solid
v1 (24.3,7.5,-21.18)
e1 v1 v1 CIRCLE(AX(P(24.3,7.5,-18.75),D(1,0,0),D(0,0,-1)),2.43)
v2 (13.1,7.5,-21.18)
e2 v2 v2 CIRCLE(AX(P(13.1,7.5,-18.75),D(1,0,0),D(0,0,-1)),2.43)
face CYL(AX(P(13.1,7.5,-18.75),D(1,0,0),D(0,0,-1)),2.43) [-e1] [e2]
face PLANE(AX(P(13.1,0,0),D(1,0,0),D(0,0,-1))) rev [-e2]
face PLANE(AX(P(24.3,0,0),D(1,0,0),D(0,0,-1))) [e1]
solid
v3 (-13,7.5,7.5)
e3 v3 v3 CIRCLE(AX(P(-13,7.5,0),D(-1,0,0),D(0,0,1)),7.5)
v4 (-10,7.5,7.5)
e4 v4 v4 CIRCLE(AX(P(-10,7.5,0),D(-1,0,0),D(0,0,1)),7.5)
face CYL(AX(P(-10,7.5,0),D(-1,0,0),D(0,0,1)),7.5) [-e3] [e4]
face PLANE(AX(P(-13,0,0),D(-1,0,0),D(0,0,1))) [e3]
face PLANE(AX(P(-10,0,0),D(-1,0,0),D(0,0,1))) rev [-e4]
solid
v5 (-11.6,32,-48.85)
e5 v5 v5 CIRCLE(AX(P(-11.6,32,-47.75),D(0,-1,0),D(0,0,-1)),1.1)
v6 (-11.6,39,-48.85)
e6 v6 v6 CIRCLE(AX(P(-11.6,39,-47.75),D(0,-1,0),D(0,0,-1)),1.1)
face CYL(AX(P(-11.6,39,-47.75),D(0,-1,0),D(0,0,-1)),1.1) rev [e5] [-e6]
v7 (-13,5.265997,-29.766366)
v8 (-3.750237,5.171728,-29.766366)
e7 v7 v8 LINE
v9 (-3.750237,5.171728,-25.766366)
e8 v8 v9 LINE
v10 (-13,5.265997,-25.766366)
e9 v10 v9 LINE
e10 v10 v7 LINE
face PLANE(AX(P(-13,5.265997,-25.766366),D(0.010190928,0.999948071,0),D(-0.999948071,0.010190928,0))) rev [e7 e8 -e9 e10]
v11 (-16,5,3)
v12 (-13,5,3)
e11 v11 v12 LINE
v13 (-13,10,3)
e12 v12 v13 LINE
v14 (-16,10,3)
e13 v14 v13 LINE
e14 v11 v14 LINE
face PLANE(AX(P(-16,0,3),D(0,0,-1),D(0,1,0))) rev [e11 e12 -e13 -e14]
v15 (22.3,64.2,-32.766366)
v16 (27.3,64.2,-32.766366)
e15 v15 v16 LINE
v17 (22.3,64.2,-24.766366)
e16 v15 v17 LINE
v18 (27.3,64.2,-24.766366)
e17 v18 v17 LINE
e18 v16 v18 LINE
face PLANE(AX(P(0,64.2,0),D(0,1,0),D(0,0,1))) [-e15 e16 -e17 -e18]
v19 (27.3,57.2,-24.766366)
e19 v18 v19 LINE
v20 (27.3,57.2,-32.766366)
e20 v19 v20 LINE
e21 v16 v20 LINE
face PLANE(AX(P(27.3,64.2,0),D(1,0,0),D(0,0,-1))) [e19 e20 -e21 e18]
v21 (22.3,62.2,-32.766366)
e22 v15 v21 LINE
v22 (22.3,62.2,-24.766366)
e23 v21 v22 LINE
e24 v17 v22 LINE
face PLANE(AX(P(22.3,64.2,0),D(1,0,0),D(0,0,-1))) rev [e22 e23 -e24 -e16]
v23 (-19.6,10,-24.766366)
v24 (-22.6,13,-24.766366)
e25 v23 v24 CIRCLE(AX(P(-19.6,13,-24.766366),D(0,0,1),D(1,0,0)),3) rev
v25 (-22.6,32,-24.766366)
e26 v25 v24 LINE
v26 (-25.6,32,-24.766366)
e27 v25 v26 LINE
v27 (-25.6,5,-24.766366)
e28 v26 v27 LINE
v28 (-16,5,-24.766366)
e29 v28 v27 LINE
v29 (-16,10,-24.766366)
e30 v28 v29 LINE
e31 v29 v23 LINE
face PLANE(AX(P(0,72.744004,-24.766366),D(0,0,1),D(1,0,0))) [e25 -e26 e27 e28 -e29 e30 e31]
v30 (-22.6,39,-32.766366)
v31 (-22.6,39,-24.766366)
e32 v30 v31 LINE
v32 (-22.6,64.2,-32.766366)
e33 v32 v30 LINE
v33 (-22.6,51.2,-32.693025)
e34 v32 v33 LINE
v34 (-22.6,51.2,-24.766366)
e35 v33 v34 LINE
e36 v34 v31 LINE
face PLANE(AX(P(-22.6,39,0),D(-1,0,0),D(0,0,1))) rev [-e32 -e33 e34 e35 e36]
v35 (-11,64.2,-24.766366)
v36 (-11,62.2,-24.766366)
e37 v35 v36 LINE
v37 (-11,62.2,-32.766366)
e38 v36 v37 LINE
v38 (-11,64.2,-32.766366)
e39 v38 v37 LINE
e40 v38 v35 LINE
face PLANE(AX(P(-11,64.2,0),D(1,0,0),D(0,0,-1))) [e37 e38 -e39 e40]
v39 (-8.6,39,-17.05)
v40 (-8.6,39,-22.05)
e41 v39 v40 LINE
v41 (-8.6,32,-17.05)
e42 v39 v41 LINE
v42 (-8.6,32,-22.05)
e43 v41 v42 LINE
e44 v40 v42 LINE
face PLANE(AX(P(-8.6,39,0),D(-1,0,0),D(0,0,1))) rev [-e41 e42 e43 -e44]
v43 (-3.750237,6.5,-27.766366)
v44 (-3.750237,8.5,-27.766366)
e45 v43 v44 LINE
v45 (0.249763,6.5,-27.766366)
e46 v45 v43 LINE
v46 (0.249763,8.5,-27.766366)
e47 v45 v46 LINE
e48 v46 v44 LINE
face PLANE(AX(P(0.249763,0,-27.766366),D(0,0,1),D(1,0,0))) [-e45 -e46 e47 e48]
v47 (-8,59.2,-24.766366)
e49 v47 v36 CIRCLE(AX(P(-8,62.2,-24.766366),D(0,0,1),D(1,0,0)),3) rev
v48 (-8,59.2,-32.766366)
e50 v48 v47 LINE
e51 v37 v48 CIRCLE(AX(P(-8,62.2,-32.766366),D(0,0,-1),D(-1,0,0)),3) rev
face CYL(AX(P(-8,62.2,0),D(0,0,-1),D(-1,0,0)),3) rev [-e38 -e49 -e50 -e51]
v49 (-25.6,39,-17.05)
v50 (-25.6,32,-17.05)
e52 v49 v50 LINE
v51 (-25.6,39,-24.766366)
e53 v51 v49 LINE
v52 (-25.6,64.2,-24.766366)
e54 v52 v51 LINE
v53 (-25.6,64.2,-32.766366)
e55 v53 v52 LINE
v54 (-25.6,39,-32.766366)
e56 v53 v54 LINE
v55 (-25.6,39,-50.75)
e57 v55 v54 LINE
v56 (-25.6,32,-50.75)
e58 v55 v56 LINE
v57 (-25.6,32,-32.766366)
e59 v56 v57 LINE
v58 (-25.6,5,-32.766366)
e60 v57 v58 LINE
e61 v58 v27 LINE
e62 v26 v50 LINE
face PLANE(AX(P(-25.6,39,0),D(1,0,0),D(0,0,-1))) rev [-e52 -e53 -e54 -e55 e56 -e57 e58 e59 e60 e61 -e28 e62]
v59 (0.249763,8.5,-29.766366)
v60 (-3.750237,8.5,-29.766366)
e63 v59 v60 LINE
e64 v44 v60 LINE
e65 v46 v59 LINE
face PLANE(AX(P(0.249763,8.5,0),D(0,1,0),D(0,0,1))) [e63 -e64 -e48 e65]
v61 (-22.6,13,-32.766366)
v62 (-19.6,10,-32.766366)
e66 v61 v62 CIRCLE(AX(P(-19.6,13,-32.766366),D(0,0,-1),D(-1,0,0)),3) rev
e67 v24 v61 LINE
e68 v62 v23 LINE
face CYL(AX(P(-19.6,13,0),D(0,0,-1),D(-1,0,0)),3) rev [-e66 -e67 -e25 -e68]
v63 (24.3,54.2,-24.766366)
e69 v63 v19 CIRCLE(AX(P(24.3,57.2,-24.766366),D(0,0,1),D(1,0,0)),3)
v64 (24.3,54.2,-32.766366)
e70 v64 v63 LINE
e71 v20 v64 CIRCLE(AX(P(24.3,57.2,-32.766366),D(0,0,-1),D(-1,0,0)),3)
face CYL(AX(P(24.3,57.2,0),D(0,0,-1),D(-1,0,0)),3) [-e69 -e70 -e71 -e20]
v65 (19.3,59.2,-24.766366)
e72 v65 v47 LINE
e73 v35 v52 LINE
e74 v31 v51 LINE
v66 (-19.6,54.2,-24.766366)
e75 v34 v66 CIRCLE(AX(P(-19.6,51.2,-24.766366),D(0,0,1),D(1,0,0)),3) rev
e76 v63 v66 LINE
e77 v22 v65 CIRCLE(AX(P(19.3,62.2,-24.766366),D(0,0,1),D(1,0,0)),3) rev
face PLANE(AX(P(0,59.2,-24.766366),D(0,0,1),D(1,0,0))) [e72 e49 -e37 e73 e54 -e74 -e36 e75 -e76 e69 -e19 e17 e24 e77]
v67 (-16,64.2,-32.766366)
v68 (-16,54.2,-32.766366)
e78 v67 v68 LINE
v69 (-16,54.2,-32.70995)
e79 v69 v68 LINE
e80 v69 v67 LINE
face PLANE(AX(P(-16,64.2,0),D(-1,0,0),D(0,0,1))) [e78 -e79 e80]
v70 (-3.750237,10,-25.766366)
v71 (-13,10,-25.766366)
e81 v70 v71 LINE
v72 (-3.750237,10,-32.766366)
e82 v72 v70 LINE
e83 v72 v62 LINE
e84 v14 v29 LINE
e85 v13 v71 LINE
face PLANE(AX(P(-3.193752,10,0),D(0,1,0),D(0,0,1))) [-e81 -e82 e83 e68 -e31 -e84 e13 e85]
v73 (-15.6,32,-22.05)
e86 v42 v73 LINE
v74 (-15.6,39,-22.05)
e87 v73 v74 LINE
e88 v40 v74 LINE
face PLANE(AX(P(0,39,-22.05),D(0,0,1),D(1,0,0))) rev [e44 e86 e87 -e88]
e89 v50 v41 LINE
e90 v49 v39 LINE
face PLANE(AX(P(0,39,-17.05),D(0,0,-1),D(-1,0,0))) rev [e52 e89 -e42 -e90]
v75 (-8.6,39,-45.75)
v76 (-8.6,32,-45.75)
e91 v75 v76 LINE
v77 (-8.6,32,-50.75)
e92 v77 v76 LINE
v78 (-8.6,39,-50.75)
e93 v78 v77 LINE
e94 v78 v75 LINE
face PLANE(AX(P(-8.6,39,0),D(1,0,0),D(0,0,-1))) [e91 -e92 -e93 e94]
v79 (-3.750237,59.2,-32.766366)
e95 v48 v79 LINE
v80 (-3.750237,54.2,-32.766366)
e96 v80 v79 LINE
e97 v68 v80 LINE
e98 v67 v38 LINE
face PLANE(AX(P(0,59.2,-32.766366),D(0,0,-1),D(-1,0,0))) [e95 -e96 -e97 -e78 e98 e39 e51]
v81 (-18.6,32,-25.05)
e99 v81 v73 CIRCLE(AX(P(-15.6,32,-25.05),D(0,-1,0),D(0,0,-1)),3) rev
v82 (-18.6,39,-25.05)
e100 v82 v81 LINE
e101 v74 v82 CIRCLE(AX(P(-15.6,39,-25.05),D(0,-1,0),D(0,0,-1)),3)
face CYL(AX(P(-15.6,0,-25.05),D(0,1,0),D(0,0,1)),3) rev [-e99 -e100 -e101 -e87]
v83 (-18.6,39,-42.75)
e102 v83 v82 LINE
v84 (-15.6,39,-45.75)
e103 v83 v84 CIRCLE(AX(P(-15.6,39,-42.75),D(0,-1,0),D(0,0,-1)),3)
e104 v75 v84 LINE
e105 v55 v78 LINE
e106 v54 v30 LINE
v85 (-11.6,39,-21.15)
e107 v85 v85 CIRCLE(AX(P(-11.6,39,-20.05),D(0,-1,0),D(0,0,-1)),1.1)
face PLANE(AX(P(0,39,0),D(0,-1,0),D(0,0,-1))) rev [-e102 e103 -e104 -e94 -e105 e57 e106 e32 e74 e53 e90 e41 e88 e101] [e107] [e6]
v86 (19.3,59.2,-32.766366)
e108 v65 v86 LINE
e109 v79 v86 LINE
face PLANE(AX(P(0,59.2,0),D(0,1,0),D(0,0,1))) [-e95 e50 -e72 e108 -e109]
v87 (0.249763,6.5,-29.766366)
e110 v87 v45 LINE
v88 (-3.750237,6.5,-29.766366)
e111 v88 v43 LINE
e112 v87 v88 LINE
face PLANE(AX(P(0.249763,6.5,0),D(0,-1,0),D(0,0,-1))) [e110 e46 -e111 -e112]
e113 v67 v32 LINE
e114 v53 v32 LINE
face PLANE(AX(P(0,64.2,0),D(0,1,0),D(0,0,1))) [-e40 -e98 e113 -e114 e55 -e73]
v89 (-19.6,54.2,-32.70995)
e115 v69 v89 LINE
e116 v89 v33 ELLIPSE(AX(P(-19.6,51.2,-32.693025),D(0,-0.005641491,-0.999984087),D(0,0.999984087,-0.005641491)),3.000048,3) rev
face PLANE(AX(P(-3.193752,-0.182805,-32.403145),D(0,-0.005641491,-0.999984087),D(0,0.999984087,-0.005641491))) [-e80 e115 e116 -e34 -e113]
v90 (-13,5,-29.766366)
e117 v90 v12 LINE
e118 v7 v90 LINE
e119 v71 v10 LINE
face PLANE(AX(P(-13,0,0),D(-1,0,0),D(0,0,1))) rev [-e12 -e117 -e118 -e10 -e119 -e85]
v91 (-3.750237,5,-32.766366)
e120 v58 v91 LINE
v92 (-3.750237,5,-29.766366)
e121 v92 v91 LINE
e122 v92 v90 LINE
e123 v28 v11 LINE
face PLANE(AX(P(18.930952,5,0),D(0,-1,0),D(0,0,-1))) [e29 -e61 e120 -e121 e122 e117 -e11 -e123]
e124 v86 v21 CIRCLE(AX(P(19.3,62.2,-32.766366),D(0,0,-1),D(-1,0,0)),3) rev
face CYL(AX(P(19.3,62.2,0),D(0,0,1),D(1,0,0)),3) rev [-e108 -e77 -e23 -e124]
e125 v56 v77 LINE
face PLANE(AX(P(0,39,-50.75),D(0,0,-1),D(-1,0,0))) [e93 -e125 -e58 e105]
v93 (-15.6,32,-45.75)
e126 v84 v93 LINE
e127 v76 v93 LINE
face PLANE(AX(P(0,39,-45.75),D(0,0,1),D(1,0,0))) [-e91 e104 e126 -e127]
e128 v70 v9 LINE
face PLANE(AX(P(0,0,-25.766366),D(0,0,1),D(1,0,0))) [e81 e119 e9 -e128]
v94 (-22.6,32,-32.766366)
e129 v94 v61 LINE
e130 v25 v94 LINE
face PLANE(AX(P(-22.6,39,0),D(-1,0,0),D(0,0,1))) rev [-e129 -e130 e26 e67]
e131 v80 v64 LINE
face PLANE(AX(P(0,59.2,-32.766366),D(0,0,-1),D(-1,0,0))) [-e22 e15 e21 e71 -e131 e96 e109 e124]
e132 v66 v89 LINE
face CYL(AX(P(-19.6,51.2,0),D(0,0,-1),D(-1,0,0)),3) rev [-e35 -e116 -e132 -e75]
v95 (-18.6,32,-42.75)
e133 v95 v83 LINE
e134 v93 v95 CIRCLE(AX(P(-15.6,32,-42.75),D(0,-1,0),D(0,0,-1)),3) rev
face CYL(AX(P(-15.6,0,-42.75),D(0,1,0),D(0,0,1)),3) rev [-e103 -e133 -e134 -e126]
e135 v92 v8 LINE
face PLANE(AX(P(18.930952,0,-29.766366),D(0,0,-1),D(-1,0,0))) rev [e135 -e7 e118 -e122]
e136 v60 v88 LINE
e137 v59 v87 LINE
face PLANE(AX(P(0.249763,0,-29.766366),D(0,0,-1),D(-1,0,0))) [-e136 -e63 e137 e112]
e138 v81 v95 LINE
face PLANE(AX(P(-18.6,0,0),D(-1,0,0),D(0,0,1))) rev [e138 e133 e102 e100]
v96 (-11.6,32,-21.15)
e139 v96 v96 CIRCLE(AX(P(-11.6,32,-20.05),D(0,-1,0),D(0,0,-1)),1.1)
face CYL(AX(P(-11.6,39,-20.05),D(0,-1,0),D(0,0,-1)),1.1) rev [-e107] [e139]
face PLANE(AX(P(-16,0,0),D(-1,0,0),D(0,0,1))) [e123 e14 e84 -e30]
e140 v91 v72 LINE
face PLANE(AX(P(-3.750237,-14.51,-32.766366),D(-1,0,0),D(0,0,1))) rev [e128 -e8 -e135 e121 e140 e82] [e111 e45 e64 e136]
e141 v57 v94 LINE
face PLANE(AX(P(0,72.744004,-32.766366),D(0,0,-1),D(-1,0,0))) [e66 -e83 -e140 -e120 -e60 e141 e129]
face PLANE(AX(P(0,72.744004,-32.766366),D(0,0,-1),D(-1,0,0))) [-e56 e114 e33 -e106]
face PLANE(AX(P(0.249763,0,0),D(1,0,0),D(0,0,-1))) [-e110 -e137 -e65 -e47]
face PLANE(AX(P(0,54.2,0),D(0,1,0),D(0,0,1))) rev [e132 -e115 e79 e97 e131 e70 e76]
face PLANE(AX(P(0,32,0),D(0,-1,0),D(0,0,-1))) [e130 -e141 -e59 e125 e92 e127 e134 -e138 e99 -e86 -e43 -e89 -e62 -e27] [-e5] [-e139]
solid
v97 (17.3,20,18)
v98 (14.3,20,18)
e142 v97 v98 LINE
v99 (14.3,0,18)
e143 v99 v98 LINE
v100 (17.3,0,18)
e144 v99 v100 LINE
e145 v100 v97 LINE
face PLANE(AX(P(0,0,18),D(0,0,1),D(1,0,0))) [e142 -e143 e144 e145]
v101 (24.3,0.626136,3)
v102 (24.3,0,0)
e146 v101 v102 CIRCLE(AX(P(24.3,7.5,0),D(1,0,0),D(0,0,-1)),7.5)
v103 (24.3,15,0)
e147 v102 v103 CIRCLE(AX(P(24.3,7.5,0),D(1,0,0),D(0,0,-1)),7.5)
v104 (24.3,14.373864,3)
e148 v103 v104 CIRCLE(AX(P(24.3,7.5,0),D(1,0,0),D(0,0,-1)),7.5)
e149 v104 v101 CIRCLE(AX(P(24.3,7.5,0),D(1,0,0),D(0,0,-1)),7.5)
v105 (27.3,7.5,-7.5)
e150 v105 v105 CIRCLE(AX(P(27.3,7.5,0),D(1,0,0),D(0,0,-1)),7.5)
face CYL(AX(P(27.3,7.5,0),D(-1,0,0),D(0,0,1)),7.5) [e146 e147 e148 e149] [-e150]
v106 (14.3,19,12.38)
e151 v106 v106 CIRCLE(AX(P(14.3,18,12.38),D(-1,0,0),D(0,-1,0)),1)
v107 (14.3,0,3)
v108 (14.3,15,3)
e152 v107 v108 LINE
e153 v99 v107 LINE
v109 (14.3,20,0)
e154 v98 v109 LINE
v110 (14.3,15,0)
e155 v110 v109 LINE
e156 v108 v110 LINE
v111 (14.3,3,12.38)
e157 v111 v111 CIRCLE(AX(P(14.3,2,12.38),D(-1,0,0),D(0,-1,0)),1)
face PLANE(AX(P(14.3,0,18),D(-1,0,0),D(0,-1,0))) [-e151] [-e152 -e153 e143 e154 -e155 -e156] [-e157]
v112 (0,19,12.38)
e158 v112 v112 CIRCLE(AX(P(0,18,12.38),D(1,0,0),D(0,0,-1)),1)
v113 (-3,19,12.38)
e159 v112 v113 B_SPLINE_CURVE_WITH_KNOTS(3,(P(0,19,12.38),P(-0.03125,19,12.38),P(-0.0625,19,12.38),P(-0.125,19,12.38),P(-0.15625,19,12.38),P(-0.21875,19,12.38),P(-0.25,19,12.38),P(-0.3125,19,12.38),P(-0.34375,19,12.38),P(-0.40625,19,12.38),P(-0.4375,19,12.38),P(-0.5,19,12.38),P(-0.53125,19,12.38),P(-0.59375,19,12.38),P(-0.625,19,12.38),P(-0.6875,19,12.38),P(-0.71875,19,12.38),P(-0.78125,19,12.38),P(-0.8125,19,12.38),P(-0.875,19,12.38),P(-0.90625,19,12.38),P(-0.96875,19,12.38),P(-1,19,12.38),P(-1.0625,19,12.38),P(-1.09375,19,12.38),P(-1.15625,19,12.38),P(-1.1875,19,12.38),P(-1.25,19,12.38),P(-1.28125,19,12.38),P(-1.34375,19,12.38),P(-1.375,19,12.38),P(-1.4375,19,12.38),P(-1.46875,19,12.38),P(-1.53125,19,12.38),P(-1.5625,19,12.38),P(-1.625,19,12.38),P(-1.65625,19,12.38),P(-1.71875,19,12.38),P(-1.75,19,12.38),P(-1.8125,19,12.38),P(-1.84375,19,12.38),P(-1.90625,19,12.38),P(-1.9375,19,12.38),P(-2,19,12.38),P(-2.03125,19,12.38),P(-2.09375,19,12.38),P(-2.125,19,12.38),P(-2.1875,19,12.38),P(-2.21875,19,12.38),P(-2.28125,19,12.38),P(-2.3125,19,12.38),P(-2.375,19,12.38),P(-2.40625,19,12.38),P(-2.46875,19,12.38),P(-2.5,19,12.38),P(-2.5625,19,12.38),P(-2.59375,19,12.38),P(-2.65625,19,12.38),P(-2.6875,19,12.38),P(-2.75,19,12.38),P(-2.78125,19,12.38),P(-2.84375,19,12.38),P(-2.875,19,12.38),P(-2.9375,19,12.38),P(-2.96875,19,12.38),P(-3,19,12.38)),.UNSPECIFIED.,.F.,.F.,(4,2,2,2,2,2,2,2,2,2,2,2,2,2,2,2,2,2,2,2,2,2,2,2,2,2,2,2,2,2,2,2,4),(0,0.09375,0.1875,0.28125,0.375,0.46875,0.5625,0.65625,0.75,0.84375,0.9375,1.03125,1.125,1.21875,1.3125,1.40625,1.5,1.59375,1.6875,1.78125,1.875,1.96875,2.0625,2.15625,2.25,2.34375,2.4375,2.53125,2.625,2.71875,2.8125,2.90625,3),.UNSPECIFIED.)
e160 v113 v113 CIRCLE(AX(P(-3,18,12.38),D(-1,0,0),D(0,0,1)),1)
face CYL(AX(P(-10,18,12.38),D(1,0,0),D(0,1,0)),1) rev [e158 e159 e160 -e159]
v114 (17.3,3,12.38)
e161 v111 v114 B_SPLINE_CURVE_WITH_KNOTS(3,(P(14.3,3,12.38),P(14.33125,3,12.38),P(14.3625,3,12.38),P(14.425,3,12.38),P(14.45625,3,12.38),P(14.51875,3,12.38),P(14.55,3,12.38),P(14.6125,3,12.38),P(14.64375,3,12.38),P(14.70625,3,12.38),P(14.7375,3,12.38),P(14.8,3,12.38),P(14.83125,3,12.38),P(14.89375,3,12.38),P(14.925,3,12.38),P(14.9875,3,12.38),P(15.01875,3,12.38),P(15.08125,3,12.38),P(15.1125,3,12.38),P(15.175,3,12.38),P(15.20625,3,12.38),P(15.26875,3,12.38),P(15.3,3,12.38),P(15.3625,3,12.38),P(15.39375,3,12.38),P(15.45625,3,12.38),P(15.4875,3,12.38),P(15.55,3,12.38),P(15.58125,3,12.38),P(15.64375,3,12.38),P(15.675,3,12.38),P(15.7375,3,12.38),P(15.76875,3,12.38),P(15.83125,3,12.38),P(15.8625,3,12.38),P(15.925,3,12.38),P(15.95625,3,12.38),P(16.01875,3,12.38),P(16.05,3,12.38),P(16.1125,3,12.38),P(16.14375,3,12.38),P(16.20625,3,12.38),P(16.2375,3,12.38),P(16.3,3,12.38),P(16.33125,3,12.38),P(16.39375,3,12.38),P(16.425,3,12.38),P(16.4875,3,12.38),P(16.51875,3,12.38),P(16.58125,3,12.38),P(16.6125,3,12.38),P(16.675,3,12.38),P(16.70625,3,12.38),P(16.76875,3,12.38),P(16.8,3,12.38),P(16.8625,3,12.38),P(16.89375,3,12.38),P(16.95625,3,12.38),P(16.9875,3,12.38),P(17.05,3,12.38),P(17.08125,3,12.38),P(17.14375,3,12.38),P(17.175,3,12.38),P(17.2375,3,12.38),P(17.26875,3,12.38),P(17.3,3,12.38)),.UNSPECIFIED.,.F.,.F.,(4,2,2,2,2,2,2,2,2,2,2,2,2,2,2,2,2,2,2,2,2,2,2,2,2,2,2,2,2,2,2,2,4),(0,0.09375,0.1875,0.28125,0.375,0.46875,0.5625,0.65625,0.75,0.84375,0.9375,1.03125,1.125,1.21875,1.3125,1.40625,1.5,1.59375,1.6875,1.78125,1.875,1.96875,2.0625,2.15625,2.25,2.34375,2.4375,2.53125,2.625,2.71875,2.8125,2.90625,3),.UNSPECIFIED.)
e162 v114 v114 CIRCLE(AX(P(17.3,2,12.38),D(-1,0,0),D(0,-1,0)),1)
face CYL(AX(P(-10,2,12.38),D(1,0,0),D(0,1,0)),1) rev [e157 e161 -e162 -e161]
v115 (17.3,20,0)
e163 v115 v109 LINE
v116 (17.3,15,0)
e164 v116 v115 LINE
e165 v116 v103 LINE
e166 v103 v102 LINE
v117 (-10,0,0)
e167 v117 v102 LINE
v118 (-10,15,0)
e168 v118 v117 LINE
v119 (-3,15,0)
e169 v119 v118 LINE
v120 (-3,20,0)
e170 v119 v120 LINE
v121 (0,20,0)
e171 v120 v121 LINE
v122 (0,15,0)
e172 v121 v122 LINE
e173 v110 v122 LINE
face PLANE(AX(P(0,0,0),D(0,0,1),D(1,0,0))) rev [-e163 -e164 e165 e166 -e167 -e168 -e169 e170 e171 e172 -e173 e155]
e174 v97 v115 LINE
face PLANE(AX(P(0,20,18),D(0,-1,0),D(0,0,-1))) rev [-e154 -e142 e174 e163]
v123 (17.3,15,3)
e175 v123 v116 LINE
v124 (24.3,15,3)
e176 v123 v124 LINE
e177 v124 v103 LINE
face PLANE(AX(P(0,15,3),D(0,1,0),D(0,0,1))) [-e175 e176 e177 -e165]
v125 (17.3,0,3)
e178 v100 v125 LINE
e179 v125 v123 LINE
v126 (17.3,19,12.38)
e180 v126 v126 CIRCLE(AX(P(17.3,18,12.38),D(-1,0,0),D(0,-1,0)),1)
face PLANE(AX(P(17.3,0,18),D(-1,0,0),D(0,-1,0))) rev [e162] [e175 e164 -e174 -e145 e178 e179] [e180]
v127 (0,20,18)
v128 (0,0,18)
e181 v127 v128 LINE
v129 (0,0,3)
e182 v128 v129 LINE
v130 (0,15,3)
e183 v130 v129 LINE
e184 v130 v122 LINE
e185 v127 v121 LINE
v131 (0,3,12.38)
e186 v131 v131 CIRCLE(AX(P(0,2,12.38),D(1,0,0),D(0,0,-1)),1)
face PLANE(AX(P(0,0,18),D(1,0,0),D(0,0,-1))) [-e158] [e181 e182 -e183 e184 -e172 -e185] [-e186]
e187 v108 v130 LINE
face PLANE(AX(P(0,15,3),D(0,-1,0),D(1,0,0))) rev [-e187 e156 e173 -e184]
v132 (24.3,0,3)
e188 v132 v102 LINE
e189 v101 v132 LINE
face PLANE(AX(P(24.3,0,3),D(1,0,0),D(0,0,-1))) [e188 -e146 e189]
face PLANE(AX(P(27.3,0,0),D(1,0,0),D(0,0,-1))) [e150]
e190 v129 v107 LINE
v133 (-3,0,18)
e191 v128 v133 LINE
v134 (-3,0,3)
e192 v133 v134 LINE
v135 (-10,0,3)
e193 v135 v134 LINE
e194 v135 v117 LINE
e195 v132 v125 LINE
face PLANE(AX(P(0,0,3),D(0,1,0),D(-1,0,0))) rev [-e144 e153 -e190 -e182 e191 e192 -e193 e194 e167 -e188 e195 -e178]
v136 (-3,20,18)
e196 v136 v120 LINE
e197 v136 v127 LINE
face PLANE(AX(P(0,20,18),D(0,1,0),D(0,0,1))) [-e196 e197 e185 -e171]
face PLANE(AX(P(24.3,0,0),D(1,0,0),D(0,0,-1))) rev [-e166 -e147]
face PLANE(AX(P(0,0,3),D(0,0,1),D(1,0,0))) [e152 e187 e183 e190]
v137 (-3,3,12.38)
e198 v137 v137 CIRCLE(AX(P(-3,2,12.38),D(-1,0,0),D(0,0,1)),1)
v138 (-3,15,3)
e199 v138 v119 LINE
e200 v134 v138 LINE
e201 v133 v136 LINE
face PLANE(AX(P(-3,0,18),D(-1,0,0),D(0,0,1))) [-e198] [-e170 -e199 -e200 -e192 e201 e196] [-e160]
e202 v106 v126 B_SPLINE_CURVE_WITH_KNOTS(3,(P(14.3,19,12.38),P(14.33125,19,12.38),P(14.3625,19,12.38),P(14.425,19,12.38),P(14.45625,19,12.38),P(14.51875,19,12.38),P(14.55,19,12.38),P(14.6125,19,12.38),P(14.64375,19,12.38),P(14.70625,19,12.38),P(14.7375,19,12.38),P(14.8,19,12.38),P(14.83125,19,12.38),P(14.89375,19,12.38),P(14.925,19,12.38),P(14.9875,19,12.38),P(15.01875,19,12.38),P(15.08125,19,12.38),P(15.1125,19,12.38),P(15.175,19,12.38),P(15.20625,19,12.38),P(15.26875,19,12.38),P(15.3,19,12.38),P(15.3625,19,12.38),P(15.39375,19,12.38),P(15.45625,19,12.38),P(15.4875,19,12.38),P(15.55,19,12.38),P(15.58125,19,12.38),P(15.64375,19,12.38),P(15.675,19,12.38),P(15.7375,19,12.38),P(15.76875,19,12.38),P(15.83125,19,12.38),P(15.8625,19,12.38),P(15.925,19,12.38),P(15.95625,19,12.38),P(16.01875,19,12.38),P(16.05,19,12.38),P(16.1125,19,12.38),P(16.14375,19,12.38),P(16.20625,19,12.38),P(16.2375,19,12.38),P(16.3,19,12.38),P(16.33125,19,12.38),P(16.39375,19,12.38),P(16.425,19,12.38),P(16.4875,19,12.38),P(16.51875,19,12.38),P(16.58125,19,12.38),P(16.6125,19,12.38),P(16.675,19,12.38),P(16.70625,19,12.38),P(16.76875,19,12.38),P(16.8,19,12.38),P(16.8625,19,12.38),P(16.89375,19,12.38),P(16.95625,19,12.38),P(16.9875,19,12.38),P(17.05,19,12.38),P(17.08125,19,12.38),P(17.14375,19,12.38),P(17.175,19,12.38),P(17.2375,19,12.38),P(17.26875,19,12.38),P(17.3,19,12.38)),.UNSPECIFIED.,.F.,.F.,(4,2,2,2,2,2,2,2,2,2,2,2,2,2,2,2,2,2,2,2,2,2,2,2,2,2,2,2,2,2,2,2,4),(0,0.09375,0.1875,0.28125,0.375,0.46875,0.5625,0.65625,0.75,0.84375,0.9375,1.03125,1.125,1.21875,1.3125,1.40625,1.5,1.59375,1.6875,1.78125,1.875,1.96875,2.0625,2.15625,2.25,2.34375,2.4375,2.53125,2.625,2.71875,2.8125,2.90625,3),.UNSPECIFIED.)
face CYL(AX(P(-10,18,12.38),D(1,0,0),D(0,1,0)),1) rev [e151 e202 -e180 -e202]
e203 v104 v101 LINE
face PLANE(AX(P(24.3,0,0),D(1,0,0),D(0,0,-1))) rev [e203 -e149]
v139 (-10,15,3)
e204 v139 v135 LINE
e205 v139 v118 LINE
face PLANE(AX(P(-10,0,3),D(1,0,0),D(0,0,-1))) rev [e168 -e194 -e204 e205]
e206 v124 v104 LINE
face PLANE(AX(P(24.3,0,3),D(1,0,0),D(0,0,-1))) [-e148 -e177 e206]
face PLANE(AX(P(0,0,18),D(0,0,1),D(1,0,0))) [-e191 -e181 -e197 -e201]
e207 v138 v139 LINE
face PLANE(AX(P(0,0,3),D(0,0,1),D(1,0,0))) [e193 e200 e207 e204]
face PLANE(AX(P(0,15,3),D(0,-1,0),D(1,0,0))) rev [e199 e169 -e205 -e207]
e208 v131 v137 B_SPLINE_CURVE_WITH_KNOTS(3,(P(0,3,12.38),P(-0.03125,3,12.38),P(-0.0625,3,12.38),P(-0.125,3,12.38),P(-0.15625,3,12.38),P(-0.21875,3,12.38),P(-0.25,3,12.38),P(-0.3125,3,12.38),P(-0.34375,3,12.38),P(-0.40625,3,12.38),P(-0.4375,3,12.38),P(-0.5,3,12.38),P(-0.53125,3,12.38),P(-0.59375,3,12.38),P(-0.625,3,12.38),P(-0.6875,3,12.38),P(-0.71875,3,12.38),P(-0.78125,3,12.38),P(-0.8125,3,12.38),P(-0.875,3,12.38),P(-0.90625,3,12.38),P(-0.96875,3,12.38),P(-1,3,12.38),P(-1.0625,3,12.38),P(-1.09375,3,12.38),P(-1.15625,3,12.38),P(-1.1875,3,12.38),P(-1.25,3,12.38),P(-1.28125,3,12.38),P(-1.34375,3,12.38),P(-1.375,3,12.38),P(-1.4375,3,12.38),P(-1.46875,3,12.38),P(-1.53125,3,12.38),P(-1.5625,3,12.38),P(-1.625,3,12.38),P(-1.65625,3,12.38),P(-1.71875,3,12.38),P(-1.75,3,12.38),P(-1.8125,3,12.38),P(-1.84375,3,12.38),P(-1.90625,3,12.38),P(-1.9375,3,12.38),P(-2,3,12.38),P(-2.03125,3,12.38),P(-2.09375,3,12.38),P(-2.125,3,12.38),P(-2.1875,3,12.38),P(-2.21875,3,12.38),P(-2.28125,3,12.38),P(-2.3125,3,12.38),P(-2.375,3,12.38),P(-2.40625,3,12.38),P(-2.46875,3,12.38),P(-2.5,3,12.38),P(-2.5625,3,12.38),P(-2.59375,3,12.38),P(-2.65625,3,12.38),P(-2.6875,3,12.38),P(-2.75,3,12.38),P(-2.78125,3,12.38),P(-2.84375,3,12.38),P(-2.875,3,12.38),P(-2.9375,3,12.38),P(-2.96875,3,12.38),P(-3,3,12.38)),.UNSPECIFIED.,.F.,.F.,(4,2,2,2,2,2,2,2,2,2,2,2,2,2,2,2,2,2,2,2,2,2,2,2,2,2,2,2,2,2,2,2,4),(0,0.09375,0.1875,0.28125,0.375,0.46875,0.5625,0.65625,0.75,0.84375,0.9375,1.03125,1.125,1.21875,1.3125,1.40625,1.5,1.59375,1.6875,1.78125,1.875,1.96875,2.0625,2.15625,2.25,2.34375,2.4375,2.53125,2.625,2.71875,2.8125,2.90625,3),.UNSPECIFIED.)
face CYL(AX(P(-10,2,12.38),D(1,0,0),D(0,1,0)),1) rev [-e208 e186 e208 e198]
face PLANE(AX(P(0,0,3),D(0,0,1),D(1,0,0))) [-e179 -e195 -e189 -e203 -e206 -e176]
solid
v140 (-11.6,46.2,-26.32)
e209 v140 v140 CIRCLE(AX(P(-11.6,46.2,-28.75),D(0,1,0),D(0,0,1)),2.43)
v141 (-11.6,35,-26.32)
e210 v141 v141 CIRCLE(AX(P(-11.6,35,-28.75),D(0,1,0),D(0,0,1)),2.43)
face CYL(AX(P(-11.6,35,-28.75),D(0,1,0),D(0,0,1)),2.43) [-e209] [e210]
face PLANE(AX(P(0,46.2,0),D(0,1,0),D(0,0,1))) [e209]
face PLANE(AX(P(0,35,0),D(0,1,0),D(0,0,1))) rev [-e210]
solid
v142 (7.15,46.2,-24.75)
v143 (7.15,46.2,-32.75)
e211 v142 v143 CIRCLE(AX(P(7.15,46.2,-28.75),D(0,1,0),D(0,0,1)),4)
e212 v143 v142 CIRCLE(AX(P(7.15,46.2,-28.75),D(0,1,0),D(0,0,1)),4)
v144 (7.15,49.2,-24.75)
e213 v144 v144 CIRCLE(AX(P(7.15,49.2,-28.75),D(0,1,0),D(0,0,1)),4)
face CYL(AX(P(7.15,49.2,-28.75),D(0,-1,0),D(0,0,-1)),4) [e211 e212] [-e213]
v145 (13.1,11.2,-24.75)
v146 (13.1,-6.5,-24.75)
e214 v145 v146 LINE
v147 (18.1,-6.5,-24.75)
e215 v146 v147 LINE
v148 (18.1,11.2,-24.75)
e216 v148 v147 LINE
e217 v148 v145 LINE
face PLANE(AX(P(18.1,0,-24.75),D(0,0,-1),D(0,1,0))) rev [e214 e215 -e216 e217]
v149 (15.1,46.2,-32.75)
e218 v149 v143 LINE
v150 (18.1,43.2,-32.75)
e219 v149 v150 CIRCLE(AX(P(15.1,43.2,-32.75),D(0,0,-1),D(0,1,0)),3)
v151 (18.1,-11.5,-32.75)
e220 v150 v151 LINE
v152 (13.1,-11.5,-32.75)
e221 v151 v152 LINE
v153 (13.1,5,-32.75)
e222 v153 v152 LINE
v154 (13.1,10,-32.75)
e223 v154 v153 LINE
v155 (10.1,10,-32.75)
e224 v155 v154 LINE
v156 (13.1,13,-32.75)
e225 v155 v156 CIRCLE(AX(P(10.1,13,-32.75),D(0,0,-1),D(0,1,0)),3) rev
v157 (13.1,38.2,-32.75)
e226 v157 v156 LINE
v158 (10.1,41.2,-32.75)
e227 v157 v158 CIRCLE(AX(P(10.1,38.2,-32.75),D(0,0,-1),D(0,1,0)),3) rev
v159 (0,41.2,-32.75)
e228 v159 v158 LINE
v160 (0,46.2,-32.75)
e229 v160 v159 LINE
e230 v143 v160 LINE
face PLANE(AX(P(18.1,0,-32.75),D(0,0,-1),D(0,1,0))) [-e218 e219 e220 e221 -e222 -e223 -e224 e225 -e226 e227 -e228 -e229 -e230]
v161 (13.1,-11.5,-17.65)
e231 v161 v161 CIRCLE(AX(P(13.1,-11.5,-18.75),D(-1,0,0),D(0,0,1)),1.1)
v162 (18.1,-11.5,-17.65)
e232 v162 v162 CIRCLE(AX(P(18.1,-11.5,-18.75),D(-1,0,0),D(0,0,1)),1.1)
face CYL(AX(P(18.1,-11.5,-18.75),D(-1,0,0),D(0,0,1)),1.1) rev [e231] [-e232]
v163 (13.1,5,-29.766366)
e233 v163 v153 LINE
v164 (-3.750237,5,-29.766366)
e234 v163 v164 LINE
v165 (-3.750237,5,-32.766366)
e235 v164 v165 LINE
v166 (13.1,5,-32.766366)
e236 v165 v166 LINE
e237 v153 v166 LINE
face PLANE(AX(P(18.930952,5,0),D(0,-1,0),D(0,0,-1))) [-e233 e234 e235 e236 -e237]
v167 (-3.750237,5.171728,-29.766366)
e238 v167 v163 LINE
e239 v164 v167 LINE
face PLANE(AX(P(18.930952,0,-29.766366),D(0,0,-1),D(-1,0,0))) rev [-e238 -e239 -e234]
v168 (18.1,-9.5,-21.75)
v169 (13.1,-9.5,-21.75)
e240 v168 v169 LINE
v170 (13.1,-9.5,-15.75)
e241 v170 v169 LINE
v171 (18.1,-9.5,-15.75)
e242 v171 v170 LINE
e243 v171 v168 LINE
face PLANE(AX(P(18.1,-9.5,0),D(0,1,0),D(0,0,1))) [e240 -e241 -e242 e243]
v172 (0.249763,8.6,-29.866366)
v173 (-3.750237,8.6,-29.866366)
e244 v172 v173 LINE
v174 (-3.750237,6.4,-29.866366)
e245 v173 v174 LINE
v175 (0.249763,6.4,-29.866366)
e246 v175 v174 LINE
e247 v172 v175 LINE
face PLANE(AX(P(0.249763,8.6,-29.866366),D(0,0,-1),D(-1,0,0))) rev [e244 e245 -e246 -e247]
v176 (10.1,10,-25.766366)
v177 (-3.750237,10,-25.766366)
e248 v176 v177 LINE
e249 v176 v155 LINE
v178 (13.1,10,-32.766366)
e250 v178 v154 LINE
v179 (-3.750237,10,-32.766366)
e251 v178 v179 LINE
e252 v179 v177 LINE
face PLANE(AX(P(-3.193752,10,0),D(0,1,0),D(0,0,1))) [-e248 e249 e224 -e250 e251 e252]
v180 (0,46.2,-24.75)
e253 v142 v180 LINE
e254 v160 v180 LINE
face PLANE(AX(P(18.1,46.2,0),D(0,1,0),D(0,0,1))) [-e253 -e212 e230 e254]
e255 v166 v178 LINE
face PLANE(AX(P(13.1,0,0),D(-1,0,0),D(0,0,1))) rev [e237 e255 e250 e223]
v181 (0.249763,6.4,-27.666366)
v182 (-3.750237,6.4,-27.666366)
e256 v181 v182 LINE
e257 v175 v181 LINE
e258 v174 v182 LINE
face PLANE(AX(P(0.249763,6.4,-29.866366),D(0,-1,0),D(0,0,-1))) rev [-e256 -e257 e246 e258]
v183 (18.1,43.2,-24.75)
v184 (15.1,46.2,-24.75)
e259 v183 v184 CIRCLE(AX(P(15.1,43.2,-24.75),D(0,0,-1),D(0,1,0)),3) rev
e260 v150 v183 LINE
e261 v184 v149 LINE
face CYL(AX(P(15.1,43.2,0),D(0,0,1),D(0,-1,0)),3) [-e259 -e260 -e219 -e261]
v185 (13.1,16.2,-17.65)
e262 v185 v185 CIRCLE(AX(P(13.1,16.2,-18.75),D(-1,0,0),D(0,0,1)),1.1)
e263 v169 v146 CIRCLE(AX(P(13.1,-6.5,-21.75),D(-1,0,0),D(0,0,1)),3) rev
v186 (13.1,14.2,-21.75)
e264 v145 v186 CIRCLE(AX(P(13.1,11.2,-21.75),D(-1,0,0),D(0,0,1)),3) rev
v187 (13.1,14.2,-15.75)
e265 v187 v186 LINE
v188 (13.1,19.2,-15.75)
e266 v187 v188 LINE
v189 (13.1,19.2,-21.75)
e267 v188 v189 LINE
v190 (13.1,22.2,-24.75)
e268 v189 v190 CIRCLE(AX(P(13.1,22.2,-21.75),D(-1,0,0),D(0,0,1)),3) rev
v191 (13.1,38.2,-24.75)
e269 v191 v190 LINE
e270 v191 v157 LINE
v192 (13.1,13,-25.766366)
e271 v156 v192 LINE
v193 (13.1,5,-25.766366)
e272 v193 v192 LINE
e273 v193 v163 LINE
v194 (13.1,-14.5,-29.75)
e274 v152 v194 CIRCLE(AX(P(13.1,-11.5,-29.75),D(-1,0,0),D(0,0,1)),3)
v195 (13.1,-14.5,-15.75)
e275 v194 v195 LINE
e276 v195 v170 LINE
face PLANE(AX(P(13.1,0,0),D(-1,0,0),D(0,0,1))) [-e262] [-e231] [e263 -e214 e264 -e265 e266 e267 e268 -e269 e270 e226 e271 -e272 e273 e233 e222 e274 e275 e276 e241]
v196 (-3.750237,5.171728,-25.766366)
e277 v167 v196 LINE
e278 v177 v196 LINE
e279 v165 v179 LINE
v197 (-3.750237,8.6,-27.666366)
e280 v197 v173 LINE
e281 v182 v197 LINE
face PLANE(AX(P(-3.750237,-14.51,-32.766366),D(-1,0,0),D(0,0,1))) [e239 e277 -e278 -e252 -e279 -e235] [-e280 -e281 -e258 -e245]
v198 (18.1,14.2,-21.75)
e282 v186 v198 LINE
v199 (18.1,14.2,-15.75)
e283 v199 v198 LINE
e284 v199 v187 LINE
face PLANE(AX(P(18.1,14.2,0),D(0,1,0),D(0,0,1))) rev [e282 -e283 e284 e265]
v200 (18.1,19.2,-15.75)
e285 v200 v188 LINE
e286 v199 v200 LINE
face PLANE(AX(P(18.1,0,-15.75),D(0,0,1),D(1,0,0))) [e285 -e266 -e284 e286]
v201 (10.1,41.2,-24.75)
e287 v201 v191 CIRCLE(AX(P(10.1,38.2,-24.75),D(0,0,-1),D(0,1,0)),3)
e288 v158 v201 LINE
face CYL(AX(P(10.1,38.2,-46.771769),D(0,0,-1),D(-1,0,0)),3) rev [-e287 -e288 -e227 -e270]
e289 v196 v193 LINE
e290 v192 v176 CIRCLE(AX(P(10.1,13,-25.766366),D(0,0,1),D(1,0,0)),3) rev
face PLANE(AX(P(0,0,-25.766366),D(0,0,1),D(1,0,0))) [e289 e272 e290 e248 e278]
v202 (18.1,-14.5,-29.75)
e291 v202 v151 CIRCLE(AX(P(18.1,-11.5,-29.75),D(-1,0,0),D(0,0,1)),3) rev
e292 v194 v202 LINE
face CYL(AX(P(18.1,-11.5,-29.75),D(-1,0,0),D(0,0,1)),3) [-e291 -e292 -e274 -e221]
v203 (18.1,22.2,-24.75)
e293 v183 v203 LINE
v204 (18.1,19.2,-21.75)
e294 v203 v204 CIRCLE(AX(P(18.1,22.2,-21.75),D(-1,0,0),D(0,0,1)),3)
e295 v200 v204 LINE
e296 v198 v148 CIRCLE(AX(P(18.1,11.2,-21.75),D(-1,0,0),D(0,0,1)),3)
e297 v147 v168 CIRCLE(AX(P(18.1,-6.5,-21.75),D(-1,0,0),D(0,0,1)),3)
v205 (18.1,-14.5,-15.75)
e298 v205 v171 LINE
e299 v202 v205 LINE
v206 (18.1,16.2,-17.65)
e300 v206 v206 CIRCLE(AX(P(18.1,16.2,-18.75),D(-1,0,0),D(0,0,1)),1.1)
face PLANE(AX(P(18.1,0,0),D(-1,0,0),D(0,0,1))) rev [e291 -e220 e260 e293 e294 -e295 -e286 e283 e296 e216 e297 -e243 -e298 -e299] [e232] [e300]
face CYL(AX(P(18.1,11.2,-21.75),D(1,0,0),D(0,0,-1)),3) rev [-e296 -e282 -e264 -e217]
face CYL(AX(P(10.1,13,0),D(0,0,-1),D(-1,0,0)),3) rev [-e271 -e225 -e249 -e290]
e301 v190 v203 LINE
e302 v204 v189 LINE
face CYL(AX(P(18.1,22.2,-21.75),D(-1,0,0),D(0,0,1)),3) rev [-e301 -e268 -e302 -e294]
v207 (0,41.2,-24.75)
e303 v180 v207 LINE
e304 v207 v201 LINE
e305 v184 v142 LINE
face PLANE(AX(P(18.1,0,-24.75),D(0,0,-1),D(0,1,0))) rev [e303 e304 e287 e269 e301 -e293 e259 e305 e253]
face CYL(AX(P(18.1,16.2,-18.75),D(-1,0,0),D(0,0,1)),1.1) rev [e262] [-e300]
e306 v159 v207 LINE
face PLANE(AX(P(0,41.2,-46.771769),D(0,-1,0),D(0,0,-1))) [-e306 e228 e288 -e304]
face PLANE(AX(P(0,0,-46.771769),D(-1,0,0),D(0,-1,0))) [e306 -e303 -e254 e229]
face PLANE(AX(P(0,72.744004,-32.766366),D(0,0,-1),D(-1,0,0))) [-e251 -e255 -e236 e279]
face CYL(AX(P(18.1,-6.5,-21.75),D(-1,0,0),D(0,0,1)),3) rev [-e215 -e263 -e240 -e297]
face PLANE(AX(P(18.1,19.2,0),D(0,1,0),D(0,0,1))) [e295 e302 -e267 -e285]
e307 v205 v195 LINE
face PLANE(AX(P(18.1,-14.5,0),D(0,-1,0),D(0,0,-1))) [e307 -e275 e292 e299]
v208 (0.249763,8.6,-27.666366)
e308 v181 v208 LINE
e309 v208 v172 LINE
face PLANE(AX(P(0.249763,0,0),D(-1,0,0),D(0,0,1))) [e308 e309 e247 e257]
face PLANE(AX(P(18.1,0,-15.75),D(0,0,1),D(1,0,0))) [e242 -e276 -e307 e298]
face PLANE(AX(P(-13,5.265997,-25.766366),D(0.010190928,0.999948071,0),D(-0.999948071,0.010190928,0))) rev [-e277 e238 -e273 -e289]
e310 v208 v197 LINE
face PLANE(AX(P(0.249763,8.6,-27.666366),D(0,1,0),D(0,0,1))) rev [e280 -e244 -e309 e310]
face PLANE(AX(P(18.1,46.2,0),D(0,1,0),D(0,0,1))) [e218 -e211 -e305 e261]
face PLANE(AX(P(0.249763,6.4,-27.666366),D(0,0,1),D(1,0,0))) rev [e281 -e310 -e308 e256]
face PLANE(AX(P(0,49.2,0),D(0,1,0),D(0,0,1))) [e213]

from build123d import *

# Parameters (mm, degrees)
SKETCH_1_W                 = 14.3
SKETCH_1_H                 = 15
EXTRUDE_1_DEPTH            = 3
SKETCH_1_W_2               = 7
EXTRUDE_1_2_DEPTH          = 3
EXTRUDE_1_3_DEPTH          = 3
SKETCH_1_5_W               = 3
SKETCH_1_5_H               = 20
EXTRUDE_2_DEPTH            = 18
CUT_EXTRUDE_1_DEPTH        = 39.331318788
CUT_EXTRUDE_1_DEPTH_BACK   = 39.331318788
SKETCH_2_R                 = 1
SKETCH_4_R                 = 2.43
EXTRUDE_7_DEPTH            = 11.2
SKETCH_8_R                 = 1.1
EXTRUDE_8_DEPTH            = 5
EXTRUDE_9_DEPTH            = 3
EXTRUDE_10_DEPTH           = 3
SKETCH_9_3_W               = 35.766365843
SKETCH_9_3_H               = 5
EXTRUDE_11_DEPTH           = 3
SKETCH_9_4_W               = 3
SKETCH_9_4_H               = 5
EXTRUDE_12_DEPTH           = 26.1
EXTRUDE_13_DEPTH           = 8
SKETCH_11_R                = 4
EXTRUDE_14_DEPTH           = 3
EXTRUDE_15_DEPTH           = 5
SKETCH_12_3_W              = 5
SKETCH_12_3_H              = 8
EXTRUDE_16_DEPTH           = 10
SKETCH_11_3_R              = 2.43
EXTRUDE_17_DEPTH           = 11.2
EXTRUDE_18_DEPTH           = 3
EXTRUDE_18_DEPTH_BACK      = 4
SKETCH_13_R                = 1.1
EXTRUDE_START              = -34
EXTRUDE_20_DEPTH           = 59.2
SKETCH_15_W                = 8
SKETCH_15_H                = 5
EXTRUDE_21_DEPTH           = 6.6
EXTRUDE_22_DEPTH           = 4
SKETCH_17_W                = 23.7
SKETCH_17_H                = 7
EXTRUDE_23_DEPTH           = 4
FILLET_3_R                 = 3
FILLET_4_R                 = 3
SPLIT_START                = 13.1
SPLIT_BODIES_1_OUTLINE_R   = 1.1
SPLIT_BODIES_1_DEPTH       = 5
SPLIT_BODIES_1_2_OUTLINE_W = 5
SPLIT_BODIES_1_2_OUTLINE_H = 8
SPLIT_BODIES_1_2_DEPTH     = 15.1
SPLIT_START_2              = -3.75023667
SPLIT_BODIES_1_3_OUTLINE_W = 5
SPLIT_BODIES_1_3_OUTLINE_H = 0.016365843
SPLIT_BODIES_1_3_DEPTH     = 16.85023667
SPLIT_START_3              = -32.75
SPLIT_BODIES_1_4_DEPTH     = 6.983634157
SPLIT_START_4              = -25.766365843
SPLIT_BODIES_1_5_DEPTH     = 1.016365843
SPLIT_BODIES_1_6_DEPTH     = 2.983634157
SPLIT_START_5              = 46.2
SPLIT_BODIES_1_7_OUTLINE_R = 4
SPLIT_BODIES_1_7_DEPTH     = 3
SPLIT_BODIES_1_8_OUTLINE_R = 1.1
SPLIT_BODIES_1_8_DEPTH     = 21.85023667
SKETCH_19_W                = 2
SKETCH_19_H                = 2
EXTRUDE_24_DEPTH           = 4
SKETCH_19_3_W              = 2.2
SKETCH_19_3_H              = 2.2
CUT_EXTRUDE_2_DEPTH        = 4


with BuildPart() as part:
    # 草图1 → 凸台-拉伸1 (new body)
    with BuildSketch(Plane.XY):
        with Locations((7.15, 7.5)):
            Rectangle(SKETCH_1_W, SKETCH_1_H)
    extrude(amount=EXTRUDE_1_DEPTH)



with BuildPart() as body_2:
    # 草图1 → Extrude 1 2 (new body)
    with BuildSketch(Plane.XY):
        with Locations((-6.5, 7.5)):
            Rectangle(SKETCH_1_W_2, SKETCH_1_H)
    extrude(amount=EXTRUDE_1_2_DEPTH)


with BuildPart() as body_3:
    # 草图1 → Extrude 1 3 (new body)
    with BuildSketch(Plane.XY):
        with Locations((20.8, 7.5)):
            Rectangle(SKETCH_1_W_2, SKETCH_1_H)
    extrude(amount=EXTRUDE_1_3_DEPTH)


with BuildPart() as part_1:
    add(part.part)

    add(body_2.part)  # 凸台-拉伸2 merges body 2

    add(body_3.part)  # 凸台-拉伸2 merges body 3
    # 草图1<5> → 凸台-拉伸2 (add)
    with BuildSketch(Plane.XY):
        with Locations((-1.5, 10)):
            Rectangle(SKETCH_1_5_W, SKETCH_1_5_H)
        with Locations((15.8, 10)):
            Rectangle(SKETCH_1_5_W, SKETCH_1_5_H)
    extrude(amount=EXTRUDE_2_DEPTH)

    # 草图2 → 切除-拉伸1 (cut, two sides: drawn at the far end of the back side and taken through both)
    with BuildSketch(Plane(origin=(17.3, 0, 0), x_dir=(0, 0, -1), z_dir=(1, 0, 0)).offset(-CUT_EXTRUDE_1_DEPTH_BACK)):
        with Locations(Location((-12.38, 18, 0), (0, 0, 90))):
            Circle(SKETCH_2_R)
        with Locations(Location((-12.38, 2, 0), (0, 0, 90))):
            Circle(SKETCH_2_R)
    extrude(amount=CUT_EXTRUDE_1_DEPTH + CUT_EXTRUDE_1_DEPTH_BACK, mode=Mode.SUBTRACT)

    # 草图4<4> → 凸台-拉伸9 (add)
    with BuildSketch(Plane(origin=(24.3, 0, 0), x_dir=(0, 0, -1), z_dir=(1, 0, 0))):
        with BuildLine():
            ThreePointArc((0, 0), (5.303300859, 2.196699141), (7.5, 7.5))
            ThreePointArc((7.5, 7.5), (5.303300859, 12.803300859), (0, 15))
            Line((0, 15), (0, 0))
        make_face()
        with BuildLine():
            Line((0, 0), (0, 15))
            ThreePointArc((0, 15), (-1.532322328, 14.841797347), (-3, 14.373863542))
            Line((-3, 14.373863542), (-3, 0.626136458))
            ThreePointArc((-3, 0.626136458), (-1.532322328, 0.158202653), (0, 0))
        make_face()
        with BuildLine():
            Line((-3, 0.626136458), (-3, 14.373863542))
            ThreePointArc((-3, 14.373863542), (-7.5, 7.5), (-3, 0.626136458))
        make_face()
    extrude(amount=EXTRUDE_9_DEPTH)


with BuildPart() as body_2_2:
    # 草图4 → 凸台-拉伸7 (new body)
    with BuildSketch(Plane(origin=(24.3, 0, 0), x_dir=(0, 0, -1), z_dir=(1, 0, 0))):
        with Locations((18.75, 7.5)):
            Circle(SKETCH_4_R)
    extrude(amount=-EXTRUDE_7_DEPTH)


with BuildPart() as body_3_2:
    # 草图8 → 凸台-拉伸8 (new body)
    with BuildSketch(Plane.ZY.offset(-13.1)):
        Polygon((-24.75, 19.2), (-24.75, 46.2), (-32.75, 46.2), (-32.75, -14.5), (-15.75, -14.5), (-15.75, -11.5), (-15.75, -9.5), (-24.75, -9.5), (-24.75, 14.2), (-15.75, 14.2), (-15.75, 19.2), align=None)
        with Locations((-18.75, 16.2)):
            Circle(SKETCH_8_R, mode=Mode.SUBTRACT)
        with Locations((-18.75, -11.5)):
            Circle(SKETCH_8_R, mode=Mode.SUBTRACT)
    extrude(amount=-EXTRUDE_8_DEPTH)



with BuildPart() as body_4:
    # 草图9 → 凸台-拉伸10 (new body)
    with BuildSketch(Plane.ZY.offset(13)):
        with BuildLine():
            ThreePointArc((7.5, 7.5), (1.26826484, 14.891989197), (-7.071067812, 10))
            Line((-7.071067812, 10), (0, 10))
            Line((0, 10), (3, 10))
            Line((3, 10), (3, 5))
            Line((3, 5), (-7.071067812, 5))
            ThreePointArc((-7.071067812, 5), (1.26826484, 0.108010803), (7.5, 7.5))
        make_face()
        with BuildLine():
            Line((0, 10), (-7.071067812, 10))
            ThreePointArc((-7.071067812, 10), (-7.5, 7.5), (-7.071067812, 5))
            Line((-7.071067812, 5), (3, 5))
            Line((3, 5), (3, 10))
            Line((3, 10), (0, 10))
        make_face()
    extrude(amount=-EXTRUDE_10_DEPTH)


with BuildPart() as body_5:
    # 草图9<3> → 凸台-拉伸11 (new body)
    with BuildSketch(Plane.ZY.offset(13)):
        with Locations((-14.883182922, 7.5)):
            Rectangle(SKETCH_9_3_W, SKETCH_9_3_H)
    extrude(amount=EXTRUDE_11_DEPTH)


with BuildPart() as body_3_2_1:
    add(body_3_2.part)

    add(body_5.part)  # 凸台-拉伸12 merges body 5
    # 草图9<4> → 凸台-拉伸12 (add)
    with BuildSketch(Plane.ZY.offset(13)):
        with Locations((-31.266365843, 7.5)):
            Rectangle(SKETCH_9_4_W, SKETCH_9_4_H)
    extrude(amount=-EXTRUDE_12_DEPTH)

    # 草图10 → 凸台-拉伸13 (add)
    with BuildSketch(Plane.XY.offset(-24.75)):
        Polygon((13.1, 41.2), (13.1, 46.2), (0, 46.2), (0, 41.2), (7.15, 41.2), align=None)
    extrude(amount=-EXTRUDE_13_DEPTH)

    # 草图11 → 凸台-拉伸14 (add)
    with BuildSketch(Plane(origin=(0, 46.2, 0), x_dir=(1, 0, 0), z_dir=(0, 1, 0))):
        with Locations(Location((7.15, 28.75, 0), (0, 0, 270))):
            Circle(SKETCH_11_R)
    extrude(amount=EXTRUDE_14_DEPTH)



with BuildPart() as body_5_2:
    # 草图12 → 凸台-拉伸15 (new body)
    with BuildSketch(Plane(origin=(0, 54.2, 0), x_dir=(1, 0, 0), z_dir=(0, 1, 0))):
        Polygon((-6, 32.766365843), (-11, 32.766365843), (-11, 24.766365843), (22.3, 24.766365843), (22.3, 32.766365843), align=None)
    extrude(amount=EXTRUDE_15_DEPTH)

    # 草图12<3> → 凸台-拉伸16 (add)
    with BuildSketch(Plane(origin=(0, 54.2, 0), x_dir=(1, 0, 0), z_dir=(0, 1, 0))):
        with Locations((-13.5, 28.766365843)):
            Rectangle(SKETCH_12_3_W, SKETCH_12_3_H)
        with Locations((24.8, 28.766365843)):
            Rectangle(SKETCH_12_3_W, SKETCH_12_3_H)
    extrude(amount=EXTRUDE_16_DEPTH)


with BuildPart() as body_6:
    # 草图11<3> → 凸台-拉伸17 (new body)
    with BuildSketch(Plane(origin=(0, 46.2, 0), x_dir=(1, 0, 0), z_dir=(0, 1, 0))):
        with Locations(Location((-11.6, 28.75, 0), (0, 0, 270))):
            Circle(SKETCH_11_3_R)
    extrude(amount=-EXTRUDE_17_DEPTH)


with BuildPart() as body_7:
    # 草图13 → 凸台-拉伸18 (new, two sides: drawn at the far end of the back side and taken through both)
    # profile 1 of 3: a face of its own
    with BuildSketch(Plane.XZ.offset(-35).offset(-EXTRUDE_18_DEPTH_BACK)):
        Polygon((-8.6, -22.05), (-8.6, -20.05), (-8.6, -17.05), (-14.6, -17.05), (-22.6, -17.05), (-22.6, -22.05), (-14.6, -22.05), align=None)
        with Locations(Location((-11.6, -20.05, 0), (0, 0, 270))):
            Circle(SKETCH_13_R, mode=Mode.SUBTRACT)
    # profile 2 of 3: a face of its own
    with BuildSketch(Plane.XZ.offset(-35).offset(-EXTRUDE_18_DEPTH_BACK)):
        Polygon((-22.6, -45.75), (-22.6, -22.05), (-22.6, -17.05), (-25.6, -17.05), (-25.6, -45.75), (-25.6, -50.75), (-22.6, -50.75), align=None)
    # profile 3 of 3: a face of its own
    with BuildSketch(Plane.XZ.offset(-35).offset(-EXTRUDE_18_DEPTH_BACK)):
        Polygon((-14.6, -45.75), (-22.6, -45.75), (-22.6, -50.75), (-14.6, -50.75), (-8.6, -50.75), (-8.6, -47.75), (-8.6, -45.75), align=None)
        with Locations(Location((-11.6, -47.75, 0), (0, 0, 270))):
            Circle(SKETCH_13_R, mode=Mode.SUBTRACT)
    extrude(amount=EXTRUDE_18_DEPTH + EXTRUDE_18_DEPTH_BACK)

    # 草图14 → 凸台-拉伸20 (add)
    with BuildSketch(Plane(origin=(0, 39, 0), x_dir=(1, 0, 0), z_dir=(0, 1, 0)).offset(EXTRUDE_START)):
        Polygon((-22.6, 32.766365843), (-25.6, 32.766365843), (-25.6, 25.29220792), (-25.6, 24.766365843), (-22.6, 24.766365843), align=None)
    extrude(amount=EXTRUDE_20_DEPTH)


with BuildPart() as body_3_2_2:
    add(body_3_2_1.part)

    add(body_5_2.part)  # 凸台-拉伸21 merges body 5 2

    add(body_7.part)  # 凸台-拉伸21 merges body 7
    # 草图15 → 凸台-拉伸21 (add)
    with BuildSketch(Plane(origin=(-22.6, 0, 0), x_dir=(0, 0, -1), z_dir=(1, 0, 0))):
        with Locations((28.766365843, 7.5)):
            Rectangle(SKETCH_15_W, SKETCH_15_H)
        Polygon((24.766365843, 54.2), (32.709950035, 54.2), (32.766365843, 64.2), (24.766365843, 64.2), align=None)
    extrude(amount=EXTRUDE_21_DEPTH)

    # 草图16 → 凸台-拉伸22 (add)
    with BuildSketch(Plane.XY.offset(-29.766365843)):
        Polygon((-13, 10), (-13, 5.265997038), (13.1, 5), (13.1, 10), align=None)
    extrude(amount=EXTRUDE_22_DEPTH)

    # 草图17 → 凸台-拉伸23 (add)
    with BuildSketch(Plane(origin=(-22.6, 0, 0), x_dir=(0, 0, -1), z_dir=(1, 0, 0))):
        with Locations((33.9, 35.5)):
            Rectangle(SKETCH_17_W, SKETCH_17_H)
    extrude(amount=EXTRUDE_23_DEPTH)

    # 圆角3
    fillet_3_edges = [body_3_2_2.edges().sort_by_distance(p)[0] for p in [
        (-18.6, 35.5, -22.05),
        (-18.6, 35.5, -45.75),
        (-11, 59.2, -28.766365843),
        (-22.6, 54.2, -28.738157939),
        (22.3, 59.2, -28.766365843),
        (-22.6, 10, -28.766365843),
        (13.1, 10, -29.258182921),
        (15.6, 14.2, -24.75),
        (15.6, -9.5, -24.75),
        (15.6, 19.2, -24.75),
        (13.1, 41.2, -28.75),
    ]]
    fillet(fillet_3_edges, radius=FILLET_3_R)

    # 圆角4
    fillet_4_edges = [body_3_2_2.edges().sort_by_distance(p)[0] for p in [
        (27.3, 54.2, -28.766365843),
        (18.1, 46.2, -28.75),
        (15.6, -14.5, -32.75),
    ]]
    fillet(fillet_4_edges, radius=FILLET_4_R)

    # Split Bodies 1 8 outline → Split Bodies 1 8 (cut)
    with BuildSketch(Plane.YZ.offset(SPLIT_START_2)):
        with BuildLine():
            ThreePointArc((-14.5, -29.75), (-13.621320344, -31.871320344), (-11.5, -32.75))
            Line((-11.5, -32.75), (5, -32.75))
            Line((5, -32.75), (5, -32.766365843))
            Line((5, -32.766365843), (10, -32.766365843))
            Line((10, -32.766365843), (10, -32.75))
            Line((10, -32.75), (41.2, -32.75))
            Line((41.2, -32.75), (41.2, -32.766365843))
            Line((41.2, -32.766365843), (49.2, -32.766365843))
            Line((49.2, -32.766365843), (49.2, -14))
            Line((49.2, -14), (41.2, -14))
            Line((41.2, -14), (41.2, -24.75))
            Line((41.2, -24.75), (22.2, -24.75))
            ThreePointArc((22.2, -24.75), (20.078679656, -23.871320344), (19.2, -21.75))
            Line((19.2, -21.75), (19.2, -15.75))
            Line((19.2, -15.75), (14.2, -15.75))
            Line((14.2, -15.75), (14.2, -21.75))
            ThreePointArc((14.2, -21.75), (13.321320344, -23.871320344), (11.2, -24.75))
            Line((11.2, -24.75), (-6.5, -24.75))
            ThreePointArc((-6.5, -24.75), (-8.621320344, -23.871320344), (-9.5, -21.75))
            Line((-9.5, -21.75), (-9.5, -15.75))
            Line((-9.5, -15.75), (-14.5, -15.75))
            Line((-14.5, -15.75), (-14.5, -29.75))
        make_face()
        with Locations((-11.5, -18.75)):
            Circle(SPLIT_BODIES_1_8_OUTLINE_R, mode=Mode.SUBTRACT)
        with Locations((16.2, -18.75)):
            Circle(SPLIT_BODIES_1_8_OUTLINE_R, mode=Mode.SUBTRACT)
    extrude(amount=SPLIT_BODIES_1_8_DEPTH, mode=Mode.SUBTRACT)

    # 草图19 → 凸台-拉伸24 (add)
    with BuildSketch(Plane(origin=(-3.75023667, 0, 0), x_dir=(0, 0, -1), z_dir=(1, 0, 0))):
        with Locations((28.766365843, 7.5)):
            Rectangle(SKETCH_19_W, SKETCH_19_H)
    extrude(amount=EXTRUDE_24_DEPTH)


with BuildPart() as body_6_2:
    # Split Bodies 1: read off the stored shape, not the designer's step
    # Split Bodies 1 outline → Split Bodies 1 (new body)
    with BuildSketch(Plane.YZ.offset(SPLIT_START)):
        with BuildLine():
            Line((10, -32.75), (41.2, -32.75))
            Line((41.2, -32.75), (41.2, -24.75))
            Line((41.2, -24.75), (22.2, -24.75))
            ThreePointArc((22.2, -24.75), (20.078679656, -23.871320344), (19.2, -21.75))
            Line((19.2, -21.75), (19.2, -15.75))
            Line((19.2, -15.75), (14.2, -15.75))
            Line((14.2, -15.75), (14.2, -21.75))
            ThreePointArc((14.2, -21.75), (13.321320344, -23.871320344), (11.2, -24.75))
            Line((11.2, -24.75), (-6.5, -24.75))
            ThreePointArc((-6.5, -24.75), (-8.621320344, -23.871320344), (-9.5, -21.75))
            Line((-9.5, -21.75), (-9.5, -15.75))
            Line((-9.5, -15.75), (-14.5, -15.75))
            Line((-14.5, -15.75), (-14.5, -29.75))
            ThreePointArc((-14.5, -29.75), (-13.621320344, -31.871320344), (-11.5, -32.75))
            Line((-11.5, -32.75), (5, -32.75))
            Line((5, -32.75), (10, -32.75))
        make_face()
        with Locations((-11.5, -18.75)):
            Circle(SPLIT_BODIES_1_OUTLINE_R, mode=Mode.SUBTRACT)
        with Locations((16.2, -18.75)):
            Circle(SPLIT_BODIES_1_OUTLINE_R, mode=Mode.SUBTRACT)
    extrude(amount=SPLIT_BODIES_1_DEPTH)

    # Split Bodies 1 2 outline → Split Bodies 1 2 (add)
    with BuildSketch(Plane.YZ):
        with Locations((43.7, -28.75)):
            Rectangle(SPLIT_BODIES_1_2_OUTLINE_W, SPLIT_BODIES_1_2_OUTLINE_H)
    extrude(amount=SPLIT_BODIES_1_2_DEPTH)

    # Split Bodies 1 3 outline → Split Bodies 1 3 (add)
    with BuildSketch(Plane.YZ.offset(SPLIT_START_2)):
        with Locations((7.5, -32.758182922)):
            Rectangle(SPLIT_BODIES_1_3_OUTLINE_W, SPLIT_BODIES_1_3_OUTLINE_H)
    extrude(amount=SPLIT_BODIES_1_3_DEPTH)

    # Split Bodies 1 4 outline → Split Bodies 1 4 (add)
    with BuildSketch(Plane.XY.offset(SPLIT_START_3)):
        with BuildLine():
            Line((10.1, 10), (-3.75023667, 10))
            Line((-3.75023667, 10), (-3.75023667, 5.171728469))
            Line((-3.75023667, 5.171728469), (13.1, 5))
            Line((13.1, 5), (13.1, 13))
            ThreePointArc((13.1, 13), (12.221320344, 10.878679656), (10.1, 10))
        make_face()
        with BuildLine():
            ThreePointArc((10.1, 41.2), (12.221320344, 40.321320344), (13.1, 38.2))
            Line((13.1, 38.2), (13.1, 41.2))
            Line((13.1, 41.2), (10.1, 41.2))
        make_face()
        with BuildLine():
            Line((18.1, 41.2), (18.1, 43.2))
            ThreePointArc((18.1, 43.2), (17.221320344, 45.321320344), (15.1, 46.2))
            Line((15.1, 46.2), (15.1, 41.2))
            Line((15.1, 41.2), (18.1, 41.2))
        make_face()
    extrude(amount=SPLIT_BODIES_1_4_DEPTH)

    # Split Bodies 1 5 outline → Split Bodies 1 5 (add)
    with BuildSketch(Plane.XY.offset(SPLIT_START_4)):
        with BuildLine():
            ThreePointArc((10.1, 41.2), (12.221320344, 40.321320344), (13.1, 38.2))
            Line((13.1, 38.2), (13.1, 41.2))
            Line((13.1, 41.2), (10.1, 41.2))
        make_face()
        with BuildLine():
            Line((18.1, 41.2), (18.1, 43.2))
            ThreePointArc((18.1, 43.2), (17.221320344, 45.321320344), (15.1, 46.2))
            Line((15.1, 46.2), (15.1, 41.2))
            Line((15.1, 41.2), (18.1, 41.2))
        make_face()
    extrude(amount=SPLIT_BODIES_1_5_DEPTH)

    # Split Bodies 1 6 outline → Split Bodies 1 6 (add)
    with BuildSketch(Plane.XY.offset(SPLIT_START_3)):
        Polygon((13.1, 5), (-3.75023667, 5.171728469), (-3.75023667, 5), align=None)
    extrude(amount=SPLIT_BODIES_1_6_DEPTH)

    # Split Bodies 1 7 outline → Split Bodies 1 7 (add)
    with BuildSketch(Plane(origin=(0, 0, 0), x_dir=(1, 0, 0), z_dir=(0, 1, 0)).offset(SPLIT_START_5)):
        with Locations((7.15, 28.75)):
            Circle(SPLIT_BODIES_1_7_OUTLINE_R)
    extrude(amount=SPLIT_BODIES_1_7_DEPTH)

    # 草图19<3> → 切除-拉伸2 (cut)
    with BuildSketch(Plane(origin=(-3.75023667, 0, 0), x_dir=(0, 0, -1), z_dir=(1, 0, 0))):
        with Locations((28.766365843, 7.5)):
            Rectangle(SKETCH_19_3_W, SKETCH_19_3_H)
    extrude(amount=CUT_EXTRUDE_2_DEPTH, mode=Mode.SUBTRACT)


solid = Compound([part_1.part, body_2_2.part, body_4.part, body_6.part, body_3_2_2.part, body_6_2.part])
